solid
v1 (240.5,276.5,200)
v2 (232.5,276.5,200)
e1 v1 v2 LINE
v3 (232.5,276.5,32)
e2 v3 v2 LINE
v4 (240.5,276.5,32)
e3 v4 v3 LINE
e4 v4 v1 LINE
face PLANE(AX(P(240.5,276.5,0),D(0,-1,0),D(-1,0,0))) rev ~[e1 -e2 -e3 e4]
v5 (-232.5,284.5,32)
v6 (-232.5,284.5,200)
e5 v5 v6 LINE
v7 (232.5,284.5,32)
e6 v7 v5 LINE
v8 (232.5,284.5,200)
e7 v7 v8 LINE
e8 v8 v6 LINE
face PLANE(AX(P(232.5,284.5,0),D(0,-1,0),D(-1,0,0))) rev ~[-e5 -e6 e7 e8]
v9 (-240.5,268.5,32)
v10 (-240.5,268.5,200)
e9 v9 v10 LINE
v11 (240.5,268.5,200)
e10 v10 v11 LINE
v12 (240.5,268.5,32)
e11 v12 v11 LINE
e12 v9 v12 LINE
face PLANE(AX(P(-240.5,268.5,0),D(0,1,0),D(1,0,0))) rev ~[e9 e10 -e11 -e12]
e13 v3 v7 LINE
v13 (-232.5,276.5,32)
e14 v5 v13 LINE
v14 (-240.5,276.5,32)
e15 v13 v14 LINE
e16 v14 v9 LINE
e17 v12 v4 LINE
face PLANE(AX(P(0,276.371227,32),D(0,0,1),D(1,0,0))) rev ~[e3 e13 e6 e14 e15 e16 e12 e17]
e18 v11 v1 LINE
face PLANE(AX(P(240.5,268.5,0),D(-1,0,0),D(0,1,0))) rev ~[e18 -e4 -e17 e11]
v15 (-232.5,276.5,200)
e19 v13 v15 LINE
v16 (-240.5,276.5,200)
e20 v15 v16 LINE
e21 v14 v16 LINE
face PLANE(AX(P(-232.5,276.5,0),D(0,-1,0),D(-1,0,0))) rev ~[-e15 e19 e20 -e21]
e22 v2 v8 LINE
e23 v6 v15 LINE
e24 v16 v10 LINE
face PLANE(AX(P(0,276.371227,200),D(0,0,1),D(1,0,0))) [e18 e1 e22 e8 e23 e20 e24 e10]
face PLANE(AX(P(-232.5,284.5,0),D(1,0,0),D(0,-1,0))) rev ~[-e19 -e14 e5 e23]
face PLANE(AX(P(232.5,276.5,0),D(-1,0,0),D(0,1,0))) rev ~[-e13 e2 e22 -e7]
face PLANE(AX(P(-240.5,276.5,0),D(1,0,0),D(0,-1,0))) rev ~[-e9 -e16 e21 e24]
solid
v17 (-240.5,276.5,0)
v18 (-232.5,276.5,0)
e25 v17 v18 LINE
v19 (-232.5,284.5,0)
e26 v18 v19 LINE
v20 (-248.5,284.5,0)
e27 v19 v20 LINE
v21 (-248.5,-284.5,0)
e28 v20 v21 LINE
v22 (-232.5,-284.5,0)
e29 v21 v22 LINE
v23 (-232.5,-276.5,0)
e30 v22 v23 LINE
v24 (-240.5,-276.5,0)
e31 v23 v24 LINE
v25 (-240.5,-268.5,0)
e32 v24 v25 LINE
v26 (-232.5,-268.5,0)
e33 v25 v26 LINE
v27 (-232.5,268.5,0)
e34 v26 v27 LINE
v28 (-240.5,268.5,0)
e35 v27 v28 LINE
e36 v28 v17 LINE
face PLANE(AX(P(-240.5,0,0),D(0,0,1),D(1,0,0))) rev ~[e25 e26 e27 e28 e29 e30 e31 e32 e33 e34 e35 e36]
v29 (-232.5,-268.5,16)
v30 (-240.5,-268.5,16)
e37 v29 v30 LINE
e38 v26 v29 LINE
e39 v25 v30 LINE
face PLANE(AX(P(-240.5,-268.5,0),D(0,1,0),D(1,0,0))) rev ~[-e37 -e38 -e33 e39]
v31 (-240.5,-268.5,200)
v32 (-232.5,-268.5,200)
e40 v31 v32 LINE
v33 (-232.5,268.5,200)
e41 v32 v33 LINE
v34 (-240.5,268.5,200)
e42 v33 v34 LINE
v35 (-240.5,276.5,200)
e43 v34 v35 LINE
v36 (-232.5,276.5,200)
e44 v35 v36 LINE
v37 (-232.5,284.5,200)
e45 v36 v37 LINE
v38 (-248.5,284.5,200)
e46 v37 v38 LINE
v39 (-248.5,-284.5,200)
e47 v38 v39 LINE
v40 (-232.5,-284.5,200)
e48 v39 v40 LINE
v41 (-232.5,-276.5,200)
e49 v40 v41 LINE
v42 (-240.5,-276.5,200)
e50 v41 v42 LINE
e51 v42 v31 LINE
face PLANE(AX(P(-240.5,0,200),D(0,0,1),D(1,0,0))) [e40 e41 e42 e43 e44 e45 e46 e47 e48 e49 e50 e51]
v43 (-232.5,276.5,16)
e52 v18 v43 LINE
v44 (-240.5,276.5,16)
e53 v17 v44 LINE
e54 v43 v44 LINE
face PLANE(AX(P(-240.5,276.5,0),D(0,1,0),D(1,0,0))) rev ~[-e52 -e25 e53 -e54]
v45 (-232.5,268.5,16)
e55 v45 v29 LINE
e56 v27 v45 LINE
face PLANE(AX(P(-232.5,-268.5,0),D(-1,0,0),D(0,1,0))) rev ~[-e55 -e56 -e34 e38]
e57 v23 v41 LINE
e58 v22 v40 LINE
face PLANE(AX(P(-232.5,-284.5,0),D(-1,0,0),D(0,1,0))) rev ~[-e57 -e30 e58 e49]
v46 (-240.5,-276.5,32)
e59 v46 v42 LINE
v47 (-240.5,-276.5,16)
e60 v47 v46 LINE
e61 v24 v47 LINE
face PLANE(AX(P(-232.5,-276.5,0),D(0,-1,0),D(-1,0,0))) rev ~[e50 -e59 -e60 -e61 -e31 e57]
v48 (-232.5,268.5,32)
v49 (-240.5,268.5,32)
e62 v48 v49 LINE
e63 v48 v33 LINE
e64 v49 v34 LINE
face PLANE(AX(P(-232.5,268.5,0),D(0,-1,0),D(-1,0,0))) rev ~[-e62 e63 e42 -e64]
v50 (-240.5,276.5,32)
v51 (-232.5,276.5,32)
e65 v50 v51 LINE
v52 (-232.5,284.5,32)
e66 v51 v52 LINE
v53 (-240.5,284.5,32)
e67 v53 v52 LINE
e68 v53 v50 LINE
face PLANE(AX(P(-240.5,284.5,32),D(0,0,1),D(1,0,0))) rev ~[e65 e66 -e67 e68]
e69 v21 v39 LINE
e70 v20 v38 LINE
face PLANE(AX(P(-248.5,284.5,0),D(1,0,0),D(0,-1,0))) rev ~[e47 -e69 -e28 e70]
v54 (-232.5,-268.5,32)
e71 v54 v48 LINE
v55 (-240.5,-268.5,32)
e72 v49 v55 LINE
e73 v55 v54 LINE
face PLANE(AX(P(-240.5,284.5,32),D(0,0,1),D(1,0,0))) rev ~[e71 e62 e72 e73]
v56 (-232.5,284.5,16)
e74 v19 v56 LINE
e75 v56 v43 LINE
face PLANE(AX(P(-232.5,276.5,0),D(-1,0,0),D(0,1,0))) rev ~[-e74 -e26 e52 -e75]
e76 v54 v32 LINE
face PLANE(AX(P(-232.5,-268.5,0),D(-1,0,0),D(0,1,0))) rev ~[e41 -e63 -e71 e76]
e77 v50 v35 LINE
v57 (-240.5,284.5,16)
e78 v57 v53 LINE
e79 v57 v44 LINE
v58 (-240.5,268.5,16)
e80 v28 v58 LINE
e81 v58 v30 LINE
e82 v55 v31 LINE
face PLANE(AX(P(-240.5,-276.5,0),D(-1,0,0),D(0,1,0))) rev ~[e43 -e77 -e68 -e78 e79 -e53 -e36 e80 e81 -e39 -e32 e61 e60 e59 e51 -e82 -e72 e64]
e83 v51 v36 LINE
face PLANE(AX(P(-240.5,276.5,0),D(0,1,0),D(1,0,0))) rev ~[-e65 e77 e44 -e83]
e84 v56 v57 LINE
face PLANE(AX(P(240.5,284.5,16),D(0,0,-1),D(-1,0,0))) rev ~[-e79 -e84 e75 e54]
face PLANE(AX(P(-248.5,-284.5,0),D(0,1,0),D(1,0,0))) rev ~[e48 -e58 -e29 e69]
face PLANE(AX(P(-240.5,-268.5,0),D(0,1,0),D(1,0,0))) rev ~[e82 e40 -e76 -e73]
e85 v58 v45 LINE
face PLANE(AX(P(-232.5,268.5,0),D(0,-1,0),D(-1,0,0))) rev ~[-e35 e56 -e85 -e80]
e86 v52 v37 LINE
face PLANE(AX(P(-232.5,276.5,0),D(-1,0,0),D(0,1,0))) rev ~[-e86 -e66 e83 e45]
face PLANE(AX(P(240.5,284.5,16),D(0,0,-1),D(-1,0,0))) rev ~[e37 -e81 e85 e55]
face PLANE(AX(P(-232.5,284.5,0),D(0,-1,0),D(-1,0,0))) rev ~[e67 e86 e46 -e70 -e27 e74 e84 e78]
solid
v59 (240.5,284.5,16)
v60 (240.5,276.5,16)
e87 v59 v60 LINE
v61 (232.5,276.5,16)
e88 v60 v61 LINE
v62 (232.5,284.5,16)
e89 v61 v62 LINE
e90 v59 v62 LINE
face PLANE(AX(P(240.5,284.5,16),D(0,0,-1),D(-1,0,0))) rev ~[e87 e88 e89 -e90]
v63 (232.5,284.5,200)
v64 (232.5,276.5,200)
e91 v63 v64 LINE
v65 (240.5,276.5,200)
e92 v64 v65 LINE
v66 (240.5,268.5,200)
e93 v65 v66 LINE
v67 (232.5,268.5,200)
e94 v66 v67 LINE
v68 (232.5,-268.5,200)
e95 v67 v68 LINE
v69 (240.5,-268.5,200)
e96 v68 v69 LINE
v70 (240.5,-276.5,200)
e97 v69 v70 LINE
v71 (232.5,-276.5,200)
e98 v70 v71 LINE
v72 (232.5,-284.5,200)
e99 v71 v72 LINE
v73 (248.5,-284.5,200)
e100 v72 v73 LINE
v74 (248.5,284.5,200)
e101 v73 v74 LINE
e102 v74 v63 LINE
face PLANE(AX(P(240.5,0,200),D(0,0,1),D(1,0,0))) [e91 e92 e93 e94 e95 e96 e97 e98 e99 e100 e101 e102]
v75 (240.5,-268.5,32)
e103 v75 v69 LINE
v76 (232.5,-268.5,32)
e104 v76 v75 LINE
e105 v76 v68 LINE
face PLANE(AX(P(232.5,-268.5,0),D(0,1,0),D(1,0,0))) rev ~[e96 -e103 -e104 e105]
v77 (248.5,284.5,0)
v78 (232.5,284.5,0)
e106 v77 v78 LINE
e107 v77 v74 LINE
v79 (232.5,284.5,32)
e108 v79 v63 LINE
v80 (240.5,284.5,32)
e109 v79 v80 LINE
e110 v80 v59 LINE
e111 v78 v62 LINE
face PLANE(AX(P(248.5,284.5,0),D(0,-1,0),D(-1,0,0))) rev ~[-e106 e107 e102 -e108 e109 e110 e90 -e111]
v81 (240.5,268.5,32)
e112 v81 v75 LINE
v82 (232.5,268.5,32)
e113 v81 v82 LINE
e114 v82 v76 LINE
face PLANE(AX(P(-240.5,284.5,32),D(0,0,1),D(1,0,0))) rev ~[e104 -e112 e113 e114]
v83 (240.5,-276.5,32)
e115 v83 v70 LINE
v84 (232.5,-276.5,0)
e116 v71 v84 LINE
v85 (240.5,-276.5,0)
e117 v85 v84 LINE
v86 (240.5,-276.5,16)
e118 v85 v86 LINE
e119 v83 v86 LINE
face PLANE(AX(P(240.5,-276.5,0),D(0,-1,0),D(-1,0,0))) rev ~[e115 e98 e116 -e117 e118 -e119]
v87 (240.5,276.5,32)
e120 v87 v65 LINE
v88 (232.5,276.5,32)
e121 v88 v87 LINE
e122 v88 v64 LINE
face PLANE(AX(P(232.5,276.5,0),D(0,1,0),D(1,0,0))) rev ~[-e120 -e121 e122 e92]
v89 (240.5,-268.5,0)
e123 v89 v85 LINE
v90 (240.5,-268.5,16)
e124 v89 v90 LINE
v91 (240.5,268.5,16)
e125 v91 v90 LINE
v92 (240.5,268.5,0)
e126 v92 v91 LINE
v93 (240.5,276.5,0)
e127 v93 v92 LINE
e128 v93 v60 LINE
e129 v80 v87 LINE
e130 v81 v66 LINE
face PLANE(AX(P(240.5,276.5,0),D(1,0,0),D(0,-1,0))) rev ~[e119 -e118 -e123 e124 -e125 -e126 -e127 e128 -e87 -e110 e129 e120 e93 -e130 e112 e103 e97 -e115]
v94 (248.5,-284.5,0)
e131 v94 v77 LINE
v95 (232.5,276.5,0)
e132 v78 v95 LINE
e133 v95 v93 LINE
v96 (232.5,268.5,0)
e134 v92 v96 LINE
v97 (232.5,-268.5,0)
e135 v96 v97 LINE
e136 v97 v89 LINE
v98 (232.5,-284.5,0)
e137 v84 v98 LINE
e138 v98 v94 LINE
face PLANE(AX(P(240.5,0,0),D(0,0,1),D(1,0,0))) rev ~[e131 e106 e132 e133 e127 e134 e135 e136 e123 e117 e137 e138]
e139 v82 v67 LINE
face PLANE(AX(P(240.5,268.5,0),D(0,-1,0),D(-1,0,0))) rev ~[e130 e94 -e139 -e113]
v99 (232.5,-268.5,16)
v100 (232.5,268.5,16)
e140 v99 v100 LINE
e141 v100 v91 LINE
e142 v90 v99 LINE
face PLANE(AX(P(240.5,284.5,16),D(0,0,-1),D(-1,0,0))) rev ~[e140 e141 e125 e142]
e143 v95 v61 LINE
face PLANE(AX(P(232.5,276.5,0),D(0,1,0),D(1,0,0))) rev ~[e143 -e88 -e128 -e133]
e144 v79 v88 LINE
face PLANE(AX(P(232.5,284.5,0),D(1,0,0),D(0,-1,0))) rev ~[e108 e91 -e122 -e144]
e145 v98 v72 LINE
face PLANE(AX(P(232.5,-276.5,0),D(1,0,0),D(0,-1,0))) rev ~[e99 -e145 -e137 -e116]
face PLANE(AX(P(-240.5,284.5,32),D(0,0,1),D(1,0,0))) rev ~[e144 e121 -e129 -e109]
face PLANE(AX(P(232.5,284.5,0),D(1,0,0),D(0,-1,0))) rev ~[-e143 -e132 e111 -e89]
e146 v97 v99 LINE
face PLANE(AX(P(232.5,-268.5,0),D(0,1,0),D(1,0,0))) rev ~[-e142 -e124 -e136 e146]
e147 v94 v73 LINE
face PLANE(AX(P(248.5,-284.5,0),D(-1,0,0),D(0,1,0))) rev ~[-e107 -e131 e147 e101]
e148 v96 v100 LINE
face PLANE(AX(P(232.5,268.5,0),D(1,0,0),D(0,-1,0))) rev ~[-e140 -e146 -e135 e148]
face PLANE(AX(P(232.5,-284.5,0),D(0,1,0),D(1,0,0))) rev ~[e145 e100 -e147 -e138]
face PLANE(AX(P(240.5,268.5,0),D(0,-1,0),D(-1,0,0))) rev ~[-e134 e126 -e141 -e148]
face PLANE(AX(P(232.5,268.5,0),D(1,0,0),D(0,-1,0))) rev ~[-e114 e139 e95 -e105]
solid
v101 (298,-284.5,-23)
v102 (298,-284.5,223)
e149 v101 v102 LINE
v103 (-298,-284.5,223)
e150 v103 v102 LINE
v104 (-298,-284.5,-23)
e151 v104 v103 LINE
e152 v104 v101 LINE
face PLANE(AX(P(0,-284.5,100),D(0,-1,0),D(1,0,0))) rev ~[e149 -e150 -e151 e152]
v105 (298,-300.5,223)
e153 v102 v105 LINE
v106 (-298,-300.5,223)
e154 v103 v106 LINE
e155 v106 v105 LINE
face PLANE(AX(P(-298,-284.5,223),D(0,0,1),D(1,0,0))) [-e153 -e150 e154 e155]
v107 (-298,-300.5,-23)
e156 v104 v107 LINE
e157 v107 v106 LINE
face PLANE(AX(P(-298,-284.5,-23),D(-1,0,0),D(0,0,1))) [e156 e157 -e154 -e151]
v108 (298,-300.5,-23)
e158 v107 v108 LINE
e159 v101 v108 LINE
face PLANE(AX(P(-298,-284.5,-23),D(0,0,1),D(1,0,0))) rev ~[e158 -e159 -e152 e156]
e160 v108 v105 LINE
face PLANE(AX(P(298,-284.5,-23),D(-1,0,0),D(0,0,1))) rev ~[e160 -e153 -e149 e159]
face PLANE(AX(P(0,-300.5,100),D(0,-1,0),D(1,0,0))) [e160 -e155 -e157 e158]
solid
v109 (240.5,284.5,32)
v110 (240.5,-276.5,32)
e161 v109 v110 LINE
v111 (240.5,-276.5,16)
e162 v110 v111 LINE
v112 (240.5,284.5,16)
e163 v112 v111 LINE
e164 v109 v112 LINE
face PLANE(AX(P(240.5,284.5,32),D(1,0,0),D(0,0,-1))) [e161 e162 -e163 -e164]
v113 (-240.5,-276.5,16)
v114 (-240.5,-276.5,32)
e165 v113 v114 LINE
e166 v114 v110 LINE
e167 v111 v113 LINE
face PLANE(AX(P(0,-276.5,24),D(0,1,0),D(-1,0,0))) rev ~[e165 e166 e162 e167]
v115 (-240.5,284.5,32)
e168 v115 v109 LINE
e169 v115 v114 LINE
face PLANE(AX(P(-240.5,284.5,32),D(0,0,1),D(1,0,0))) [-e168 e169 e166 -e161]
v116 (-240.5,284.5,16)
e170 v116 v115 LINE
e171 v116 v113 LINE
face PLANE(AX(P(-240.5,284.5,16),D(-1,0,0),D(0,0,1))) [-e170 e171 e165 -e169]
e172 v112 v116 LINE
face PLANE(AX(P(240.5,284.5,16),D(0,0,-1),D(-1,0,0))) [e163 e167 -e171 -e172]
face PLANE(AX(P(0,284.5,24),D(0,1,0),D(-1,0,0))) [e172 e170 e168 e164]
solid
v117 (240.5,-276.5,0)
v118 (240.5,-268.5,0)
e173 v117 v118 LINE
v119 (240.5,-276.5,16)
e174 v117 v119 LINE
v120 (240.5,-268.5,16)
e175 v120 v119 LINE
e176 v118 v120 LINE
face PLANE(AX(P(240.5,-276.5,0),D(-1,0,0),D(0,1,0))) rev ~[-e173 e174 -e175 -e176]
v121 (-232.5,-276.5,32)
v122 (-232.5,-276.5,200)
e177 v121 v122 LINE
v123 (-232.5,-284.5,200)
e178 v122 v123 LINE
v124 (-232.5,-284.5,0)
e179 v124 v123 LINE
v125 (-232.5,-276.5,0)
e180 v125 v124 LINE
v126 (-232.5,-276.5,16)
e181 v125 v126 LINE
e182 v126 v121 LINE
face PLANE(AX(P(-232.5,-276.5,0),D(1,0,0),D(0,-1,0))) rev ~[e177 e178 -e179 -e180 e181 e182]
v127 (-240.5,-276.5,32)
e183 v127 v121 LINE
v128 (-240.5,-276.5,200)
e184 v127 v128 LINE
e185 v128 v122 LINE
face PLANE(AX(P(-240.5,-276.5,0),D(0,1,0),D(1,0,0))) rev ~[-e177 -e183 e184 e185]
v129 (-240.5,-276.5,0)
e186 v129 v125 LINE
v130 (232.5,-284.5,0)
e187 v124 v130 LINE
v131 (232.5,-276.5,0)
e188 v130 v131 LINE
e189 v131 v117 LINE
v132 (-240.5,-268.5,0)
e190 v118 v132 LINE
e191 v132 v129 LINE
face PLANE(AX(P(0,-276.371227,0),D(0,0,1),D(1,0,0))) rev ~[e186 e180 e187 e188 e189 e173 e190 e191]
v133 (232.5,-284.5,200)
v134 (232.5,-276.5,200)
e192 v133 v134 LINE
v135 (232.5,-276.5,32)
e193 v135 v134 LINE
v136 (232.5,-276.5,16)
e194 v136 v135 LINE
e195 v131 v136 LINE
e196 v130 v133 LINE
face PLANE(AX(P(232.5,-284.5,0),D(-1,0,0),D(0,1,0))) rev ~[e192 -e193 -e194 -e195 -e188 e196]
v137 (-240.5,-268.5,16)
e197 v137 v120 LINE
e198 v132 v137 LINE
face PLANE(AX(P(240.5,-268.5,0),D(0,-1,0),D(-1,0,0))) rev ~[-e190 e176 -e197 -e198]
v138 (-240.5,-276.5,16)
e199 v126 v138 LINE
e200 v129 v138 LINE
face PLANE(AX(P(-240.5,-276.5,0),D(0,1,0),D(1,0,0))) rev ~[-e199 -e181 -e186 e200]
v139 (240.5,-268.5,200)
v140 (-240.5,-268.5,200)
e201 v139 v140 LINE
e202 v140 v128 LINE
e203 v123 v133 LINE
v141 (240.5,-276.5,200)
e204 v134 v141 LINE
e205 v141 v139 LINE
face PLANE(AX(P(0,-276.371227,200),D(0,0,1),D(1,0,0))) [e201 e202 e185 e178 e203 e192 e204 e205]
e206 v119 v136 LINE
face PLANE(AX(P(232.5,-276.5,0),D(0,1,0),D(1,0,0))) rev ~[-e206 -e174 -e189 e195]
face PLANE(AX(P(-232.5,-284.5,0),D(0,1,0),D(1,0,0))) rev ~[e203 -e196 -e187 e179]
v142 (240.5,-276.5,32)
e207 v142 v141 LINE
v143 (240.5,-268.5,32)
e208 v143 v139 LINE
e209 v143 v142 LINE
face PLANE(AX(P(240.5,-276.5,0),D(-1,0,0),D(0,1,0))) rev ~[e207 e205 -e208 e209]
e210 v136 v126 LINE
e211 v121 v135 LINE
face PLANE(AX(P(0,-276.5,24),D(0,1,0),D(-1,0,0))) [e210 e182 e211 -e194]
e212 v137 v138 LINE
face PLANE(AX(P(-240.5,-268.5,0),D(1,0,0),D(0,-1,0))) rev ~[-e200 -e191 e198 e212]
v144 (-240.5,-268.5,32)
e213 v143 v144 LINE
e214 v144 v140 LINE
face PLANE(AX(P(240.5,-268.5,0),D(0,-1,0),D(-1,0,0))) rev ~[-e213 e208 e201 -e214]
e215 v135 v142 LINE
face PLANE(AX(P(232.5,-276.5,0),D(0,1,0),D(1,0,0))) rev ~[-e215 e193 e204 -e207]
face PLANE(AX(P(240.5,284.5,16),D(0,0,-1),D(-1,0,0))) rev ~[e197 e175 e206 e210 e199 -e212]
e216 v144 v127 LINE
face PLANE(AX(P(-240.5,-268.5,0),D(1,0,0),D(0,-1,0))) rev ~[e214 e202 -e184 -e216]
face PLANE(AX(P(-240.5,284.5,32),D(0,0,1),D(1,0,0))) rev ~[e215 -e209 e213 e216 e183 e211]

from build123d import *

# Parameters (mm, degrees)
F1_DEPTH  = 200
F2_DEPTH  = 200
F3_DEPTH  = 200
F4_DEPTH  = 200
F5_DEPTH  = 32
F7_DEPTH  = 561
F9_DEPTH  = 561
F10_W     = 596
F10_H     = 246
F10_W_2   = 465.0000002384
F10_H_2   = 200
F10_W_3   = 16
F10_W_4   = 15.9999997616
F11_DEPTH = 16


with BuildPart() as f1:
    # F0 (on Top) → F1 (new body)
    with BuildSketch(Plane.XY):
        Polygon((-248.5, -284.5), (-232.5000002384, -284.5), (-232.5000002384, -276.5000002384), (-240.5000002384, -276.5000002384), (-240.5000002384, -268.5000002384), (-232.5000002384, -268.5000002384), (-232.5000002384, 268.5000002384), (-240.5000002384, 268.5000002384), (-240.5000002384, 276.5000002384), (-232.5000002384, 276.5000002384), (-232.5000002384, 284.5), (-248.5, 284.5), align=None)
    extrude(amount=F1_DEPTH)


with BuildPart() as f2:
    # F0 (on Top) → F2 (new body)
    with BuildSketch(Plane.XY):
        Polygon((232.5, -284.5), (248.5, -284.5), (248.5, 284.5), (232.5, 284.5), (232.5, 276.5000002384), (240.5, 276.5000002384), (240.5, 268.5000002384), (232.5, 268.5000002384), (232.5, -268.5000002384), (240.5, -268.5000002384), (240.5, -276.5000002384), (232.5, -276.5000002384), align=None)
    extrude(amount=F2_DEPTH)


with BuildPart() as f3:
    # F0 (on Top) → F3 (new body)
    with BuildSketch(Plane.XY):
        Polygon((232.5, 276.5000002384), (232.5, 284.5), (-232.5000002384, 284.5), (-232.5000002384, 276.5000002384), (-240.5000002384, 276.5000002384), (-240.5000002384, 268.5000002384), (-232.5000002384, 268.5000002384), (232.5, 268.5000002384), (240.5, 268.5000002384), (240.5, 276.5000002384), align=None)
    extrude(amount=F3_DEPTH)

    # F0 (on Top) → F5 (cut)
    with BuildSketch(Plane.XY):
        Polygon((232.5, 276.5000002384), (232.5, 284.5), (-232.5000002384, 284.5), (-232.5000002384, 276.5000002384), (-240.5000002384, 276.5000002384), (-240.5000002384, 268.5000002384), (-232.5000002384, 268.5000002384), (232.5, 268.5000002384), (240.5, 268.5000002384), (240.5, 276.5000002384), align=None)
    extrude(amount=F5_DEPTH, mode=Mode.SUBTRACT)


with BuildPart() as f4:
    # F0 (on Top) → F4 (new body)
    with BuildSketch(Plane.XY):
        Polygon((-232.5000002384, -284.5), (232.5, -284.5), (232.5, -276.5000002384), (240.5, -276.5000002384), (240.5, -268.5000002384), (232.5, -268.5000002384), (-232.5000002384, -268.5000002384), (-240.5000002384, -268.5000002384), (-240.5000002384, -276.5000002384), (-232.5000002384, -276.5000002384), align=None)
    extrude(amount=F4_DEPTH)


with BuildPart() as f7:
    # F6 (on face) → F7 (new body)
    with BuildSketch(Plane(origin=(0, 284.5, 0), x_dir=(-1, 0, 0), z_dir=(0, 1, 0))):
        Polygon((-232.5, 32), (-240.5, 32), (-240.5, 16), (240.5000002384, 16), (240.5000002384, 32), (232.5000002384, 32), align=None)
    extrude(amount=-F7_DEPTH)


with BuildPart() as f2_1:
    add(f2.part)

    # F8: cut F7
    add(f7.part, mode=Mode.SUBTRACT)


with BuildPart() as f1_1:
    add(f1.part)

    # F8: cut F7
    add(f7.part, mode=Mode.SUBTRACT)


with BuildPart() as f4_1:
    add(f4.part)

    # F8: cut F7
    add(f7.part, mode=Mode.SUBTRACT)


with BuildPart() as f9:
    # F6 (on face) → F9 (new body)
    with BuildSketch(Plane(origin=(0, 284.5, 0), x_dir=(-1, 0, 0), z_dir=(0, 1, 0))):
        Polygon((-232.5, 32), (-240.5, 32), (-240.5, 16), (240.5000002384, 16), (240.5000002384, 32), (232.5000002384, 32), align=None)
    extrude(amount=-F9_DEPTH)


with BuildPart() as f11:
    # F10 (on face) → F11 (new body)
    with BuildSketch(Plane.XZ.offset(284.5)):
        with Locations((0, 100)):
            Rectangle(F10_W, F10_H)
        Polygon((-248.5, 0), (-248.5, 200), (-232.5000002384, 200), (232.5, 200), (248.5, 200), (248.5, 0), (232.5, 0), (-232.5000002384, 0), align=None, mode=Mode.SUBTRACT)
        with Locations((-1.192e-07, 100)):
            Rectangle(F10_W_2, F10_H_2)
        with Locations((240.5, 100)):
            Rectangle(F10_W_3, F10_H_2)
        with Locations((-240.5000001192, 100)):
            Rectangle(F10_W_4, F10_H_2)
    extrude(amount=F11_DEPTH)


solid = Compound([f3.part, f2_1.part, f1_1.part, f4_1.part, f9.part, f11.part])
